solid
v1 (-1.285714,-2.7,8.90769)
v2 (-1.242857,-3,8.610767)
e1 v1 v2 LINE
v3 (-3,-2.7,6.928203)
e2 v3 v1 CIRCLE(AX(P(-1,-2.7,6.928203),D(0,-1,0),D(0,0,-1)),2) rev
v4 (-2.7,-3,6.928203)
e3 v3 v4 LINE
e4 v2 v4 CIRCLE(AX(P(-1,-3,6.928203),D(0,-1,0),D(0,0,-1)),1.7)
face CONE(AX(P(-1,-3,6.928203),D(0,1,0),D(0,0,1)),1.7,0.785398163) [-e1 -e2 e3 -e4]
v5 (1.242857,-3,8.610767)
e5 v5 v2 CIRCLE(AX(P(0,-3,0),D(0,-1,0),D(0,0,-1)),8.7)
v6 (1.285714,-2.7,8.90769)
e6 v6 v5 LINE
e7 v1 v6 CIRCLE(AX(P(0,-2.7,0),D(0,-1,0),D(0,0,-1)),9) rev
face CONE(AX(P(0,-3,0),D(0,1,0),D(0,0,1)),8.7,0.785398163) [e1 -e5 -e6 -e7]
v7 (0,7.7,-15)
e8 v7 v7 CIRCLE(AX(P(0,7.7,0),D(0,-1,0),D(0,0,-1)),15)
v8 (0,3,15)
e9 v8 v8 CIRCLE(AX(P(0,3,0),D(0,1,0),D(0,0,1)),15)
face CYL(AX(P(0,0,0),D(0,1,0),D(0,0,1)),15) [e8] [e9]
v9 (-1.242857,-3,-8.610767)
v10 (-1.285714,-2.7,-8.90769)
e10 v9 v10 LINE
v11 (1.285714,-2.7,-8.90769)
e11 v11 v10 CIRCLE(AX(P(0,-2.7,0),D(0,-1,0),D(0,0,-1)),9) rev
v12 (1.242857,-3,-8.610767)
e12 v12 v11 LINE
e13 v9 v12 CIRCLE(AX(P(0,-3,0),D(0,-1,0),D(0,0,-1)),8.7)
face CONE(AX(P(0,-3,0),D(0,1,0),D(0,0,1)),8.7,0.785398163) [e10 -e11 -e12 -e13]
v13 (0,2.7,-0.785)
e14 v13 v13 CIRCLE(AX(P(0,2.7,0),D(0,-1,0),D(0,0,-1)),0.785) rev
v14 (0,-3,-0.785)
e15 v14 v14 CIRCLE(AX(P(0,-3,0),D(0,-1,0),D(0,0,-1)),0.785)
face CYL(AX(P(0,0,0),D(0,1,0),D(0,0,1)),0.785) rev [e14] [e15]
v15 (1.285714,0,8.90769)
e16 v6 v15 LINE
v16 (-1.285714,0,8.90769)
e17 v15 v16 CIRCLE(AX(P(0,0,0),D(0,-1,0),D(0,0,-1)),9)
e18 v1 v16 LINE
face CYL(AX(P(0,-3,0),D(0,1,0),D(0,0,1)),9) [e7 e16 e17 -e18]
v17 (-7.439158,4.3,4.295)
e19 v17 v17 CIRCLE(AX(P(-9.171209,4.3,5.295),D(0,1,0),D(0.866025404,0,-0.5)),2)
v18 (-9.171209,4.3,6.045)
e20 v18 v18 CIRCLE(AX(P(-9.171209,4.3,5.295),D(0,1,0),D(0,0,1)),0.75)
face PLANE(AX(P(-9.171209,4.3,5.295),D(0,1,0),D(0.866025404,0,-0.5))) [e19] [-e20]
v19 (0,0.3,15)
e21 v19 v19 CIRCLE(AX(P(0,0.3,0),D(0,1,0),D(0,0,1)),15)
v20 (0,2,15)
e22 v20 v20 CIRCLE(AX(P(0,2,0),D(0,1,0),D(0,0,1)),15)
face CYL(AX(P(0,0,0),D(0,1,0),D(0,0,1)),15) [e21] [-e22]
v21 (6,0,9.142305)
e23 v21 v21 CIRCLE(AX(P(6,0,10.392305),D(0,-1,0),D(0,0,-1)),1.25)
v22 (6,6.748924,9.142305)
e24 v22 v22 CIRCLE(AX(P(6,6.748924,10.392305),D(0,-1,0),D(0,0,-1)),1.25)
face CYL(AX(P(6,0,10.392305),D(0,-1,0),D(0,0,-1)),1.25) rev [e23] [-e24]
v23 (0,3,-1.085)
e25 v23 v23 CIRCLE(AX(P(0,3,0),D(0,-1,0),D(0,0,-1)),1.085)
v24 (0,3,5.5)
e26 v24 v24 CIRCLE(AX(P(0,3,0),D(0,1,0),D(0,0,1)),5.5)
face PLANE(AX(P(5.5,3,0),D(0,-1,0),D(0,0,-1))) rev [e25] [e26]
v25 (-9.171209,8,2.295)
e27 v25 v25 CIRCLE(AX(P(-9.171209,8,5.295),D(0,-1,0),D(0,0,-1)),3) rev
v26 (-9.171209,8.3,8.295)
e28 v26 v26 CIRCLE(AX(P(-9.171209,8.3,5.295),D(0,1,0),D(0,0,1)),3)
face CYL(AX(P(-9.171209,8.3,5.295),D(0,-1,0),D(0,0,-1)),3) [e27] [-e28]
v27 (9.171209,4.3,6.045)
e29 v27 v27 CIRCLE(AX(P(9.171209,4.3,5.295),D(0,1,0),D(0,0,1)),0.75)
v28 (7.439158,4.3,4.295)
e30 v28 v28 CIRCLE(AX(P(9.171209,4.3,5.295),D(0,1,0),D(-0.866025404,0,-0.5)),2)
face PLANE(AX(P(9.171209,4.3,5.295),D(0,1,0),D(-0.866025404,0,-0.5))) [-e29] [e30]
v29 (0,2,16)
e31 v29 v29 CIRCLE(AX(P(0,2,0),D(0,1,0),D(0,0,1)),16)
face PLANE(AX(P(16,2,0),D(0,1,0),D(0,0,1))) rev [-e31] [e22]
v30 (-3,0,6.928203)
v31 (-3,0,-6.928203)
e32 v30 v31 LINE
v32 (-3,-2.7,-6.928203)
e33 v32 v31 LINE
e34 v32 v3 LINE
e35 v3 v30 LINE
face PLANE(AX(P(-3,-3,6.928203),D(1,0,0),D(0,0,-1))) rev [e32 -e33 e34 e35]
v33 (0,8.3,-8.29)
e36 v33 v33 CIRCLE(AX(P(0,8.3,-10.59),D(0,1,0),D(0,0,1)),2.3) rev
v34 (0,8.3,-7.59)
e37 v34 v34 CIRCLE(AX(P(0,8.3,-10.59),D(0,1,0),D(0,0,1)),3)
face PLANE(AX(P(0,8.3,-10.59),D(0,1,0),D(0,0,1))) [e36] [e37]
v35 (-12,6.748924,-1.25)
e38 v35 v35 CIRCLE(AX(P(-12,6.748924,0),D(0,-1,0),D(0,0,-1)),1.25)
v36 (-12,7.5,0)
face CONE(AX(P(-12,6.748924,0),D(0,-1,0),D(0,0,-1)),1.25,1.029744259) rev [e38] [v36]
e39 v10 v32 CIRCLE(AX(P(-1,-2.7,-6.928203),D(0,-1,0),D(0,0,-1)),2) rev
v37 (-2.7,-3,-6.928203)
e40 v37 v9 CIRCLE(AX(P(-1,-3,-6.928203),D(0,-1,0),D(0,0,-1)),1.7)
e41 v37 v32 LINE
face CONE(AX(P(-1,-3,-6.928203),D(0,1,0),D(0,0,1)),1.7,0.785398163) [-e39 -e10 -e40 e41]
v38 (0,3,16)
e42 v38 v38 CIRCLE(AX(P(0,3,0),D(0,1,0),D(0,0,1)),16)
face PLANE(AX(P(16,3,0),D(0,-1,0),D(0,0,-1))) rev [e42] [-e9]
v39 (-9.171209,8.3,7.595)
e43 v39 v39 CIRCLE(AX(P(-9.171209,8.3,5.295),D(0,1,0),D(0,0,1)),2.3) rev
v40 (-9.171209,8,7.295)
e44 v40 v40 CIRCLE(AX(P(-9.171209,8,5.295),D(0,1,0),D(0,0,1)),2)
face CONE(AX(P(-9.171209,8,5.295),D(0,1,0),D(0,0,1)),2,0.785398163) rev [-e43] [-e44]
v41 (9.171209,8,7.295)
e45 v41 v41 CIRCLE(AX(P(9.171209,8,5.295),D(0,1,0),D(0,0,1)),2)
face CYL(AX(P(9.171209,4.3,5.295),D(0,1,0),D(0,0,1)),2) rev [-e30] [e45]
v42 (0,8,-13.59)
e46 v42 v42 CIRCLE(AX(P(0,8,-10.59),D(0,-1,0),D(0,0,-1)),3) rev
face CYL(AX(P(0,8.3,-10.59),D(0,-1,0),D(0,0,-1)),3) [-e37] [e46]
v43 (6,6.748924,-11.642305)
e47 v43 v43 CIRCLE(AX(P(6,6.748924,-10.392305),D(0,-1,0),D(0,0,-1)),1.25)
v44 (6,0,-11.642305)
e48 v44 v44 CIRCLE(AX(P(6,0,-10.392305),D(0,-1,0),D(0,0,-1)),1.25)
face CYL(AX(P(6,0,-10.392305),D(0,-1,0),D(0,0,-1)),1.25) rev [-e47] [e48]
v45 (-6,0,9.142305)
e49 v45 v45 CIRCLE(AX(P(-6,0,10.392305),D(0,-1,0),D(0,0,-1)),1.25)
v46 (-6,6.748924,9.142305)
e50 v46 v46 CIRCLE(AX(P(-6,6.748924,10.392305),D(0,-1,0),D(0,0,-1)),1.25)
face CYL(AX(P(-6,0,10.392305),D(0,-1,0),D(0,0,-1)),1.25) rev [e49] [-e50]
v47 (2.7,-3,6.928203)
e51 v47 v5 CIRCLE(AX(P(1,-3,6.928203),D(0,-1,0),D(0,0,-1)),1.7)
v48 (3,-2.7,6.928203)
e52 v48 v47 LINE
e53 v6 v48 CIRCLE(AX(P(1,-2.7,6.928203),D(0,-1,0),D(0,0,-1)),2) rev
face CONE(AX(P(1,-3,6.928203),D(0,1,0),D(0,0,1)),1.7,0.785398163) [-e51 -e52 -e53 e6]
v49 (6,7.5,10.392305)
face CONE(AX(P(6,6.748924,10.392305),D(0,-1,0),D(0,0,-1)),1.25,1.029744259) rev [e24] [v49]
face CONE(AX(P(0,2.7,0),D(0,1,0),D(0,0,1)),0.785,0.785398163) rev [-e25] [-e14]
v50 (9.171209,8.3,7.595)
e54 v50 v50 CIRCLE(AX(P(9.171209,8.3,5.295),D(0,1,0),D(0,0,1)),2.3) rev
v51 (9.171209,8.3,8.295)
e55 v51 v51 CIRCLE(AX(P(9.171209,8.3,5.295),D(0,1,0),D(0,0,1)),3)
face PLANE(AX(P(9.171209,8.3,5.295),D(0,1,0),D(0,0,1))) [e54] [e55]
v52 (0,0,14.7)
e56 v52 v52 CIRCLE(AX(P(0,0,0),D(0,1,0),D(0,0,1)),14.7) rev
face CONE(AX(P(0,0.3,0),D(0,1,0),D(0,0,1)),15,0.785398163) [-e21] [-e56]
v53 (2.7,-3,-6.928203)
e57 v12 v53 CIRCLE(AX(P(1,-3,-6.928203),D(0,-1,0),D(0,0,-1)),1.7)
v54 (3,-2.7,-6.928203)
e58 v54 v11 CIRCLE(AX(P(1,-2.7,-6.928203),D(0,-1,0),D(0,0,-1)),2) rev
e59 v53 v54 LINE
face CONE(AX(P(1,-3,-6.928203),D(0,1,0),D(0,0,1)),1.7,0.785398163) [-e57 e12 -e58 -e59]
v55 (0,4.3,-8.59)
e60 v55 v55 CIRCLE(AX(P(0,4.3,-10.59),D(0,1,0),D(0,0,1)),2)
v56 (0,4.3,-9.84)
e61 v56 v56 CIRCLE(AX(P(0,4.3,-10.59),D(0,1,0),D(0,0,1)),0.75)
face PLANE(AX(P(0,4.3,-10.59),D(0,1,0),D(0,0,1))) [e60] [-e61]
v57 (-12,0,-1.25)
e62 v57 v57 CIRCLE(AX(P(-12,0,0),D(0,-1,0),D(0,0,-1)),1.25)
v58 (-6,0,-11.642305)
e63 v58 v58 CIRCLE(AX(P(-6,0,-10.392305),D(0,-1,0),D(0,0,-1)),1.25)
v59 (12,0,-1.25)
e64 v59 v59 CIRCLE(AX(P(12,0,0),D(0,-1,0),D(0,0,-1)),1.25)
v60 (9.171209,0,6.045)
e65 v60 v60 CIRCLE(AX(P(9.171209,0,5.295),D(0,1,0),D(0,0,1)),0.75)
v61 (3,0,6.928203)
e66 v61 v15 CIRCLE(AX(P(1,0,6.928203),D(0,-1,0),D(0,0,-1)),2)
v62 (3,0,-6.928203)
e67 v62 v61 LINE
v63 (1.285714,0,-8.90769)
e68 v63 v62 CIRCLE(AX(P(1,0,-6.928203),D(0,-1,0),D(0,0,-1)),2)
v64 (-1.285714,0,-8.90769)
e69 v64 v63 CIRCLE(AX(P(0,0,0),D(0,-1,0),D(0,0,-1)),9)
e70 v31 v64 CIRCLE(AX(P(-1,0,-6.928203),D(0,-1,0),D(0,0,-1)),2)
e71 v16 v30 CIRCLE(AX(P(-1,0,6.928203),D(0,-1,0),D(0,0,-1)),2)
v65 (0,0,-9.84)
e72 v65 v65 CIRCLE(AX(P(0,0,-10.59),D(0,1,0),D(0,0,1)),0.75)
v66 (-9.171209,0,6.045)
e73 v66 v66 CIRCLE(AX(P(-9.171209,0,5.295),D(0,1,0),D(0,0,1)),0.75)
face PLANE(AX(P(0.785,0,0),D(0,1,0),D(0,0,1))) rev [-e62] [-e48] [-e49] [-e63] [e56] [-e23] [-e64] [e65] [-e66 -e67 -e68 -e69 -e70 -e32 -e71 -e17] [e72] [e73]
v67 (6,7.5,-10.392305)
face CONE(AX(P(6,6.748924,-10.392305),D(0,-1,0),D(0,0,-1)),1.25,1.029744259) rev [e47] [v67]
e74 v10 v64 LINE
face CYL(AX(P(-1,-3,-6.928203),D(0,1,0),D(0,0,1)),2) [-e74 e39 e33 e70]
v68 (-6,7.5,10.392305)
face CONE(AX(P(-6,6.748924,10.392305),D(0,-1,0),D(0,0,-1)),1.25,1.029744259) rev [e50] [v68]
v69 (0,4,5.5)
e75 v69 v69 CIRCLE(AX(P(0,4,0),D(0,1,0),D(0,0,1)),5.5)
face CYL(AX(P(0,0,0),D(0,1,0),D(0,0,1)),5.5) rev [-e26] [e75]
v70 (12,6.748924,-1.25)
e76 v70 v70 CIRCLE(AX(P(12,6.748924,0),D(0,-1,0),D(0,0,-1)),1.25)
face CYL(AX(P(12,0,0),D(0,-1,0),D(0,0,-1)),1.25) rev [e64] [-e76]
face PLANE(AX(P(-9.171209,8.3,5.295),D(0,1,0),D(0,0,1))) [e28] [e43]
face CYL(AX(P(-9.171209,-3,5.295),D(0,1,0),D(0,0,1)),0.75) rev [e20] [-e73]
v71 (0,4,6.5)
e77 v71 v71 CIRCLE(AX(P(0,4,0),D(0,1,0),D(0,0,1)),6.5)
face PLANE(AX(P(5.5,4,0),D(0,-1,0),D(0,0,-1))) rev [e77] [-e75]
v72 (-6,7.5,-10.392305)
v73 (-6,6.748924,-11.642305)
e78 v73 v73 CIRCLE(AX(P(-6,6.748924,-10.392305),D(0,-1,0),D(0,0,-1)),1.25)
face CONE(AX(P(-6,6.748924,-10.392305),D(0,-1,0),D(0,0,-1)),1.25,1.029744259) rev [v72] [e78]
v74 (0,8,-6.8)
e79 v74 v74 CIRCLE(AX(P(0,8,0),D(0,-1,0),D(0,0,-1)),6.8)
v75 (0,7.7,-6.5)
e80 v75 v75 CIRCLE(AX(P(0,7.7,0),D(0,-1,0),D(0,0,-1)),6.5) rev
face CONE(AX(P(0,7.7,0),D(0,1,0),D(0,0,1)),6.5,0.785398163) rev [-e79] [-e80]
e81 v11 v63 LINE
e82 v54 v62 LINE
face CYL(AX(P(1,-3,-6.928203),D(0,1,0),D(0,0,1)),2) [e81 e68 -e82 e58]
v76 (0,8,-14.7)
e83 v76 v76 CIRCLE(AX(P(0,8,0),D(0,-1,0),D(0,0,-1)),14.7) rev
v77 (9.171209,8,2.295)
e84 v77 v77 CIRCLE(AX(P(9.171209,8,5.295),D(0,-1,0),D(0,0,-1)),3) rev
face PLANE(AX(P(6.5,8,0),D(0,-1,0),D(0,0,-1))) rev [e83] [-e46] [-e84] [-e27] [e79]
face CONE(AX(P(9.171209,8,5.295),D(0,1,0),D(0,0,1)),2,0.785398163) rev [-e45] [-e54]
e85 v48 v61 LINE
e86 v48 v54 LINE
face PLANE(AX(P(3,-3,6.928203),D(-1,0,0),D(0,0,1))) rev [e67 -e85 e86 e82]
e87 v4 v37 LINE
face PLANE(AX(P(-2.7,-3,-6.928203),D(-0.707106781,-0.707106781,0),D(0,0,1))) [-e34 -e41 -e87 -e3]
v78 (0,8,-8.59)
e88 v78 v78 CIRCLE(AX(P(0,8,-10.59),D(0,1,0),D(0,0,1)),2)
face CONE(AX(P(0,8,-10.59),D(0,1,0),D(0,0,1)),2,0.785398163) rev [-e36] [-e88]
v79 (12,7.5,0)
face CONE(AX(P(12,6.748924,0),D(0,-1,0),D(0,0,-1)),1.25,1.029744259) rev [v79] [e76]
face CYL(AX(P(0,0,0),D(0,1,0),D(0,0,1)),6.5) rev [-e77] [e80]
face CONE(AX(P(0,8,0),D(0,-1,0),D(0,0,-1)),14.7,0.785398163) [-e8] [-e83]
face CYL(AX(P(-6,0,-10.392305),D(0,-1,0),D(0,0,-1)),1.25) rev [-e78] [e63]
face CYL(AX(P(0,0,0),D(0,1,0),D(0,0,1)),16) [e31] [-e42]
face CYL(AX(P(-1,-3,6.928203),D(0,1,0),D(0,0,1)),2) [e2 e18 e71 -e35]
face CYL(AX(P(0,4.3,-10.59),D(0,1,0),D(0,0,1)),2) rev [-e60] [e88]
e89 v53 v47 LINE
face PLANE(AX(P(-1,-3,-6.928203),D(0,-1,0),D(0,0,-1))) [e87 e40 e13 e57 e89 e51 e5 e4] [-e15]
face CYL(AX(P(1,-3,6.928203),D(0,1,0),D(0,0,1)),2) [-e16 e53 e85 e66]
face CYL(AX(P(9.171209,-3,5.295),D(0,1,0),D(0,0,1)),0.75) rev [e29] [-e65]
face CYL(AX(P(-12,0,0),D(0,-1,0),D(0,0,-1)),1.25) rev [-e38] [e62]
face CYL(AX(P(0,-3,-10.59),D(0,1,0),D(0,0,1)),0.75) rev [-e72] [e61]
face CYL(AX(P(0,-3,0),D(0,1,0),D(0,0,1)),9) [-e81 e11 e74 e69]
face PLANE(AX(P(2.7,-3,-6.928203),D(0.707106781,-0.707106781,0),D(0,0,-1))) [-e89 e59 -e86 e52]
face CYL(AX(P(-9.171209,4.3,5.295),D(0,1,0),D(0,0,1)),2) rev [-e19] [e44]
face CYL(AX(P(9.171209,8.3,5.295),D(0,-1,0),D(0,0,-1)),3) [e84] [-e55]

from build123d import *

# Parameters (mm, degrees)
PATTERN_CIRCULAR_2_COUNT = 6
SKETCH_8_R               = 2
CUT_EXTRUDE_1_DEPTH      = 3.7
PATTERN_CIRCULAR_3_COUNT = 3
CHAMFER_1_SIZE           = 0.3
CHAMFER_3_SIZE           = 0.3
EXTRUDE_START            = 0.3
SKETCH_12_R              = 3
SKETCH_12_R_2            = 2
EXTRUDE_1_DEPTH          = 0.3
CHAMFER_4_SIZE           = 0.3
EXTRUDE_START_2          = 3
SKETCH_13_R              = 0.785
EXTRUDE_2_DEPTH          = 3
CHAMFER_5_SIZE           = 0.3
SKETCH_14_R              = 0.75
CUT_EXTRUDE_2_DEPTH      = 24.775828061


with BuildPart() as part:
    # 草图1 → 旋转1 (revolve)
    with BuildSketch(Plane.XY, mode=Mode.PRIVATE) as revolve_1_sk:
        Polygon((16, 3), (15, 3), (15, 8), (6.5, 8), (6.5, 4), (5.5, 4), (5.5, 3), (0.785, 3), (0.785, 0), (15, 0), (15, 2), (16, 2), align=None)
    revolve(revolve_1_sk.sketch.rotate(Axis((0, 0, 0), (0, -1, 0)), 90), axis=Axis((0, 0, 0), (0, -1, 0)))

    # 草图7 → M3 螺纹孔2 (revolve, cut)
    with BuildSketch(Plane(origin=(-12, 0, 0), x_dir=(0, 0, -1), z_dir=(1, 0, 0))):
        Polygon((0, 0), (0, 7.5), (1.25, 6.748924226), (1.25, 0), align=None)
    hole_wizard_m3_2 = revolve(axis=Axis((-12, -6.35, 0), (0, 1, 0)), mode=Mode.SUBTRACT)

    # 阵列(圆周)2: M3 螺纹孔2 ×6 about axis
    pattern_circular_2_axis = Axis((0, 0, 0), (0, 1, 0))
    for i in range(1, PATTERN_CIRCULAR_2_COUNT):
        add(hole_wizard_m3_2.rotate(pattern_circular_2_axis, i * 360 / PATTERN_CIRCULAR_2_COUNT), mode=Mode.SUBTRACT)

    # 草图8 → 切除-拉伸1 (cut)
    with BuildSketch(Plane(origin=(0, 8, 0), x_dir=(1, 0, 0), z_dir=(0, 1, 0))):
        with Locations(Location((0, 10.59, 0), (0, 0, 270))):
            Circle(SKETCH_8_R)
    cut_extrude_1 = extrude(amount=-CUT_EXTRUDE_1_DEPTH, mode=Mode.SUBTRACT)

    # 阵列(圆周)3: 切除-拉伸1 ×3 about axis
    pattern_circular_3_axis = Axis((0, 0, 0), (0, 1, 0))
    for i in range(1, PATTERN_CIRCULAR_3_COUNT):
        add(cut_extrude_1.rotate(pattern_circular_3_axis, i * 360 / PATTERN_CIRCULAR_3_COUNT), mode=Mode.SUBTRACT)

    # 倒角1
    chamfer_1_edges = [part.edges().sort_by_distance(p)[0] for p in [
        (0, 0, -15),
        (0, 8, -15),
        (0, 8, -6.5),
    ]]
    chamfer(chamfer_1_edges, length=CHAMFER_1_SIZE)

    # 倒角3
    chamfer_3_edges = [part.edges().sort_by_distance(p)[0] for p in [
        (0, 3, -0.785),
    ]]
    chamfer(chamfer_3_edges, length=CHAMFER_3_SIZE)

    # 草图12 → 凸台-拉伸1 (add)
    # profile 1 of 3: a face of its own
    with BuildSketch(Plane(origin=(0, 8, 0), x_dir=(1, 0, 0), z_dir=(0, 1, 0)).offset(EXTRUDE_START)):
        with Locations(Location((0, 10.59, 0), (0, 0, 90))):
            Circle(SKETCH_12_R)
        with Locations(Location((0, 10.59, 0), (0, 0, 270))):
            Circle(SKETCH_12_R_2, mode=Mode.SUBTRACT)
    # profile 2 of 3: a face of its own
    with BuildSketch(Plane(origin=(0, 8, 0), x_dir=(1, 0, 0), z_dir=(0, 1, 0)).offset(EXTRUDE_START)):
        with Locations(Location((-9.171209026, -5.295, 0), (0, 0, 90))):
            Circle(SKETCH_12_R)
        with Locations(Location((-9.171209026, -5.295, 0), (0, 0, 270))):
            Circle(SKETCH_12_R_2, mode=Mode.SUBTRACT)
    # profile 3 of 3: a face of its own
    with BuildSketch(Plane(origin=(0, 8, 0), x_dir=(1, 0, 0), z_dir=(0, 1, 0)).offset(EXTRUDE_START)):
        with Locations(Location((9.171209026, -5.295, 0), (0, 0, 90))):
            Circle(SKETCH_12_R)
        with Locations(Location((9.171209026, -5.295, 0), (0, 0, 270))):
            Circle(SKETCH_12_R_2, mode=Mode.SUBTRACT)
    extrude(amount=-EXTRUDE_1_DEPTH)

    # 倒角4
    # the kernel refuses this chamfer: 0.3 mm, written as the material it takes off along each edge
    with BuildSketch(Plane(origin=(9.171209026, 8.3, 5.295), x_dir=(0, 0, 1), z_dir=(-1, 0, 0))) as chamfer_4_piece_1:
        Polygon((2 + CHAMFER_4_SIZE, 0), (2, -CHAMFER_4_SIZE), (2, 0), align=None)
    revolve(axis=Axis((9.171209026, 8.3, 5.295), (0, 1, 0)), mode=Mode.SUBTRACT)
    with BuildSketch(Plane(origin=(0, 8.3, -10.59), x_dir=(0, 0, 1), z_dir=(-1, 0, 0))) as chamfer_4_piece_2:
        Polygon((2 + CHAMFER_4_SIZE, 0), (2, -CHAMFER_4_SIZE), (2, 0), align=None)
    revolve(axis=Axis((0, 8.3, -10.59), (0, 1, 0)), mode=Mode.SUBTRACT)
    with BuildSketch(Plane(origin=(-9.171209026, 8.3, 5.295), x_dir=(0, 0, 1), z_dir=(-1, 0, 0))) as chamfer_4_piece_3:
        Polygon((2 + CHAMFER_4_SIZE, 0), (2, -CHAMFER_4_SIZE), (2, 0), align=None)
    revolve(axis=Axis((-9.171209026, 8.3, 5.295), (0, 1, 0)), mode=Mode.SUBTRACT)

    # 草图13 → 凸台-拉伸2 (add)
    with BuildSketch(Plane.XZ.offset(EXTRUDE_START_2)):
        with BuildLine():
            Line((-3, 6.92820323), (-3, -6.92820323))
            ThreePointArc((-3, -6.92820323), (-2.511857892, -8.237510572), (-1.285714286, -8.907689867))
            ThreePointArc((-1.285714286, -8.907689867), (0, -9), (1.285714286, -8.907689867))
            ThreePointArc((1.285714286, -8.907689867), (2.511857892, -8.237510572), (3, -6.92820323))
            Line((3, -6.92820323), (3, 6.92820323))
            ThreePointArc((3, 6.92820323), (2.511857892, 8.237510572), (1.285714286, 8.907689867))
            ThreePointArc((1.285714286, 8.907689867), (0, 9), (-1.285714286, 8.907689867))
            ThreePointArc((-1.285714286, 8.907689867), (-2.511857892, 8.237510572), (-3, 6.92820323))
        make_face()
        with Locations(Location((0, 0, 0), (0, 0, 270))):
            Circle(SKETCH_13_R, mode=Mode.SUBTRACT)
    extrude(amount=-EXTRUDE_2_DEPTH)

    # 倒角5
    chamfer_5_edges = [part.edges().sort_by_distance(p)[0] for p in [
        (-2.511857892, -3, -8.237510572),
        (0, -3, -9),
        (2.511857892, -3, -8.237510572),
        (3, -3, 0),
        (2.511857892, -3, 8.237510572),
        (0, -3, 9),
        (-2.511857892, -3, 8.237510572),
        (-3, -3, 0),
    ]]
    chamfer(chamfer_5_edges, length=CHAMFER_5_SIZE)

    # 草图14 → 切除-拉伸2 (cut, through all)
    with BuildSketch(Plane(origin=(0, 4.3, 0), x_dir=(1, 0, 0), z_dir=(0, 1, 0))):
        with Locations(Location((9.171209026, -5.295, 0), (0, 0, 270))):
            Circle(SKETCH_14_R)
        with Locations(Location((0, 10.59, 0), (0, 0, 270))):
            Circle(SKETCH_14_R)
        with Locations(Location((-9.171209026, -5.295, 0), (0, 0, 270))):
            Circle(SKETCH_14_R)
    extrude(amount=-CUT_EXTRUDE_2_DEPTH, mode=Mode.SUBTRACT)


solid = part.part
